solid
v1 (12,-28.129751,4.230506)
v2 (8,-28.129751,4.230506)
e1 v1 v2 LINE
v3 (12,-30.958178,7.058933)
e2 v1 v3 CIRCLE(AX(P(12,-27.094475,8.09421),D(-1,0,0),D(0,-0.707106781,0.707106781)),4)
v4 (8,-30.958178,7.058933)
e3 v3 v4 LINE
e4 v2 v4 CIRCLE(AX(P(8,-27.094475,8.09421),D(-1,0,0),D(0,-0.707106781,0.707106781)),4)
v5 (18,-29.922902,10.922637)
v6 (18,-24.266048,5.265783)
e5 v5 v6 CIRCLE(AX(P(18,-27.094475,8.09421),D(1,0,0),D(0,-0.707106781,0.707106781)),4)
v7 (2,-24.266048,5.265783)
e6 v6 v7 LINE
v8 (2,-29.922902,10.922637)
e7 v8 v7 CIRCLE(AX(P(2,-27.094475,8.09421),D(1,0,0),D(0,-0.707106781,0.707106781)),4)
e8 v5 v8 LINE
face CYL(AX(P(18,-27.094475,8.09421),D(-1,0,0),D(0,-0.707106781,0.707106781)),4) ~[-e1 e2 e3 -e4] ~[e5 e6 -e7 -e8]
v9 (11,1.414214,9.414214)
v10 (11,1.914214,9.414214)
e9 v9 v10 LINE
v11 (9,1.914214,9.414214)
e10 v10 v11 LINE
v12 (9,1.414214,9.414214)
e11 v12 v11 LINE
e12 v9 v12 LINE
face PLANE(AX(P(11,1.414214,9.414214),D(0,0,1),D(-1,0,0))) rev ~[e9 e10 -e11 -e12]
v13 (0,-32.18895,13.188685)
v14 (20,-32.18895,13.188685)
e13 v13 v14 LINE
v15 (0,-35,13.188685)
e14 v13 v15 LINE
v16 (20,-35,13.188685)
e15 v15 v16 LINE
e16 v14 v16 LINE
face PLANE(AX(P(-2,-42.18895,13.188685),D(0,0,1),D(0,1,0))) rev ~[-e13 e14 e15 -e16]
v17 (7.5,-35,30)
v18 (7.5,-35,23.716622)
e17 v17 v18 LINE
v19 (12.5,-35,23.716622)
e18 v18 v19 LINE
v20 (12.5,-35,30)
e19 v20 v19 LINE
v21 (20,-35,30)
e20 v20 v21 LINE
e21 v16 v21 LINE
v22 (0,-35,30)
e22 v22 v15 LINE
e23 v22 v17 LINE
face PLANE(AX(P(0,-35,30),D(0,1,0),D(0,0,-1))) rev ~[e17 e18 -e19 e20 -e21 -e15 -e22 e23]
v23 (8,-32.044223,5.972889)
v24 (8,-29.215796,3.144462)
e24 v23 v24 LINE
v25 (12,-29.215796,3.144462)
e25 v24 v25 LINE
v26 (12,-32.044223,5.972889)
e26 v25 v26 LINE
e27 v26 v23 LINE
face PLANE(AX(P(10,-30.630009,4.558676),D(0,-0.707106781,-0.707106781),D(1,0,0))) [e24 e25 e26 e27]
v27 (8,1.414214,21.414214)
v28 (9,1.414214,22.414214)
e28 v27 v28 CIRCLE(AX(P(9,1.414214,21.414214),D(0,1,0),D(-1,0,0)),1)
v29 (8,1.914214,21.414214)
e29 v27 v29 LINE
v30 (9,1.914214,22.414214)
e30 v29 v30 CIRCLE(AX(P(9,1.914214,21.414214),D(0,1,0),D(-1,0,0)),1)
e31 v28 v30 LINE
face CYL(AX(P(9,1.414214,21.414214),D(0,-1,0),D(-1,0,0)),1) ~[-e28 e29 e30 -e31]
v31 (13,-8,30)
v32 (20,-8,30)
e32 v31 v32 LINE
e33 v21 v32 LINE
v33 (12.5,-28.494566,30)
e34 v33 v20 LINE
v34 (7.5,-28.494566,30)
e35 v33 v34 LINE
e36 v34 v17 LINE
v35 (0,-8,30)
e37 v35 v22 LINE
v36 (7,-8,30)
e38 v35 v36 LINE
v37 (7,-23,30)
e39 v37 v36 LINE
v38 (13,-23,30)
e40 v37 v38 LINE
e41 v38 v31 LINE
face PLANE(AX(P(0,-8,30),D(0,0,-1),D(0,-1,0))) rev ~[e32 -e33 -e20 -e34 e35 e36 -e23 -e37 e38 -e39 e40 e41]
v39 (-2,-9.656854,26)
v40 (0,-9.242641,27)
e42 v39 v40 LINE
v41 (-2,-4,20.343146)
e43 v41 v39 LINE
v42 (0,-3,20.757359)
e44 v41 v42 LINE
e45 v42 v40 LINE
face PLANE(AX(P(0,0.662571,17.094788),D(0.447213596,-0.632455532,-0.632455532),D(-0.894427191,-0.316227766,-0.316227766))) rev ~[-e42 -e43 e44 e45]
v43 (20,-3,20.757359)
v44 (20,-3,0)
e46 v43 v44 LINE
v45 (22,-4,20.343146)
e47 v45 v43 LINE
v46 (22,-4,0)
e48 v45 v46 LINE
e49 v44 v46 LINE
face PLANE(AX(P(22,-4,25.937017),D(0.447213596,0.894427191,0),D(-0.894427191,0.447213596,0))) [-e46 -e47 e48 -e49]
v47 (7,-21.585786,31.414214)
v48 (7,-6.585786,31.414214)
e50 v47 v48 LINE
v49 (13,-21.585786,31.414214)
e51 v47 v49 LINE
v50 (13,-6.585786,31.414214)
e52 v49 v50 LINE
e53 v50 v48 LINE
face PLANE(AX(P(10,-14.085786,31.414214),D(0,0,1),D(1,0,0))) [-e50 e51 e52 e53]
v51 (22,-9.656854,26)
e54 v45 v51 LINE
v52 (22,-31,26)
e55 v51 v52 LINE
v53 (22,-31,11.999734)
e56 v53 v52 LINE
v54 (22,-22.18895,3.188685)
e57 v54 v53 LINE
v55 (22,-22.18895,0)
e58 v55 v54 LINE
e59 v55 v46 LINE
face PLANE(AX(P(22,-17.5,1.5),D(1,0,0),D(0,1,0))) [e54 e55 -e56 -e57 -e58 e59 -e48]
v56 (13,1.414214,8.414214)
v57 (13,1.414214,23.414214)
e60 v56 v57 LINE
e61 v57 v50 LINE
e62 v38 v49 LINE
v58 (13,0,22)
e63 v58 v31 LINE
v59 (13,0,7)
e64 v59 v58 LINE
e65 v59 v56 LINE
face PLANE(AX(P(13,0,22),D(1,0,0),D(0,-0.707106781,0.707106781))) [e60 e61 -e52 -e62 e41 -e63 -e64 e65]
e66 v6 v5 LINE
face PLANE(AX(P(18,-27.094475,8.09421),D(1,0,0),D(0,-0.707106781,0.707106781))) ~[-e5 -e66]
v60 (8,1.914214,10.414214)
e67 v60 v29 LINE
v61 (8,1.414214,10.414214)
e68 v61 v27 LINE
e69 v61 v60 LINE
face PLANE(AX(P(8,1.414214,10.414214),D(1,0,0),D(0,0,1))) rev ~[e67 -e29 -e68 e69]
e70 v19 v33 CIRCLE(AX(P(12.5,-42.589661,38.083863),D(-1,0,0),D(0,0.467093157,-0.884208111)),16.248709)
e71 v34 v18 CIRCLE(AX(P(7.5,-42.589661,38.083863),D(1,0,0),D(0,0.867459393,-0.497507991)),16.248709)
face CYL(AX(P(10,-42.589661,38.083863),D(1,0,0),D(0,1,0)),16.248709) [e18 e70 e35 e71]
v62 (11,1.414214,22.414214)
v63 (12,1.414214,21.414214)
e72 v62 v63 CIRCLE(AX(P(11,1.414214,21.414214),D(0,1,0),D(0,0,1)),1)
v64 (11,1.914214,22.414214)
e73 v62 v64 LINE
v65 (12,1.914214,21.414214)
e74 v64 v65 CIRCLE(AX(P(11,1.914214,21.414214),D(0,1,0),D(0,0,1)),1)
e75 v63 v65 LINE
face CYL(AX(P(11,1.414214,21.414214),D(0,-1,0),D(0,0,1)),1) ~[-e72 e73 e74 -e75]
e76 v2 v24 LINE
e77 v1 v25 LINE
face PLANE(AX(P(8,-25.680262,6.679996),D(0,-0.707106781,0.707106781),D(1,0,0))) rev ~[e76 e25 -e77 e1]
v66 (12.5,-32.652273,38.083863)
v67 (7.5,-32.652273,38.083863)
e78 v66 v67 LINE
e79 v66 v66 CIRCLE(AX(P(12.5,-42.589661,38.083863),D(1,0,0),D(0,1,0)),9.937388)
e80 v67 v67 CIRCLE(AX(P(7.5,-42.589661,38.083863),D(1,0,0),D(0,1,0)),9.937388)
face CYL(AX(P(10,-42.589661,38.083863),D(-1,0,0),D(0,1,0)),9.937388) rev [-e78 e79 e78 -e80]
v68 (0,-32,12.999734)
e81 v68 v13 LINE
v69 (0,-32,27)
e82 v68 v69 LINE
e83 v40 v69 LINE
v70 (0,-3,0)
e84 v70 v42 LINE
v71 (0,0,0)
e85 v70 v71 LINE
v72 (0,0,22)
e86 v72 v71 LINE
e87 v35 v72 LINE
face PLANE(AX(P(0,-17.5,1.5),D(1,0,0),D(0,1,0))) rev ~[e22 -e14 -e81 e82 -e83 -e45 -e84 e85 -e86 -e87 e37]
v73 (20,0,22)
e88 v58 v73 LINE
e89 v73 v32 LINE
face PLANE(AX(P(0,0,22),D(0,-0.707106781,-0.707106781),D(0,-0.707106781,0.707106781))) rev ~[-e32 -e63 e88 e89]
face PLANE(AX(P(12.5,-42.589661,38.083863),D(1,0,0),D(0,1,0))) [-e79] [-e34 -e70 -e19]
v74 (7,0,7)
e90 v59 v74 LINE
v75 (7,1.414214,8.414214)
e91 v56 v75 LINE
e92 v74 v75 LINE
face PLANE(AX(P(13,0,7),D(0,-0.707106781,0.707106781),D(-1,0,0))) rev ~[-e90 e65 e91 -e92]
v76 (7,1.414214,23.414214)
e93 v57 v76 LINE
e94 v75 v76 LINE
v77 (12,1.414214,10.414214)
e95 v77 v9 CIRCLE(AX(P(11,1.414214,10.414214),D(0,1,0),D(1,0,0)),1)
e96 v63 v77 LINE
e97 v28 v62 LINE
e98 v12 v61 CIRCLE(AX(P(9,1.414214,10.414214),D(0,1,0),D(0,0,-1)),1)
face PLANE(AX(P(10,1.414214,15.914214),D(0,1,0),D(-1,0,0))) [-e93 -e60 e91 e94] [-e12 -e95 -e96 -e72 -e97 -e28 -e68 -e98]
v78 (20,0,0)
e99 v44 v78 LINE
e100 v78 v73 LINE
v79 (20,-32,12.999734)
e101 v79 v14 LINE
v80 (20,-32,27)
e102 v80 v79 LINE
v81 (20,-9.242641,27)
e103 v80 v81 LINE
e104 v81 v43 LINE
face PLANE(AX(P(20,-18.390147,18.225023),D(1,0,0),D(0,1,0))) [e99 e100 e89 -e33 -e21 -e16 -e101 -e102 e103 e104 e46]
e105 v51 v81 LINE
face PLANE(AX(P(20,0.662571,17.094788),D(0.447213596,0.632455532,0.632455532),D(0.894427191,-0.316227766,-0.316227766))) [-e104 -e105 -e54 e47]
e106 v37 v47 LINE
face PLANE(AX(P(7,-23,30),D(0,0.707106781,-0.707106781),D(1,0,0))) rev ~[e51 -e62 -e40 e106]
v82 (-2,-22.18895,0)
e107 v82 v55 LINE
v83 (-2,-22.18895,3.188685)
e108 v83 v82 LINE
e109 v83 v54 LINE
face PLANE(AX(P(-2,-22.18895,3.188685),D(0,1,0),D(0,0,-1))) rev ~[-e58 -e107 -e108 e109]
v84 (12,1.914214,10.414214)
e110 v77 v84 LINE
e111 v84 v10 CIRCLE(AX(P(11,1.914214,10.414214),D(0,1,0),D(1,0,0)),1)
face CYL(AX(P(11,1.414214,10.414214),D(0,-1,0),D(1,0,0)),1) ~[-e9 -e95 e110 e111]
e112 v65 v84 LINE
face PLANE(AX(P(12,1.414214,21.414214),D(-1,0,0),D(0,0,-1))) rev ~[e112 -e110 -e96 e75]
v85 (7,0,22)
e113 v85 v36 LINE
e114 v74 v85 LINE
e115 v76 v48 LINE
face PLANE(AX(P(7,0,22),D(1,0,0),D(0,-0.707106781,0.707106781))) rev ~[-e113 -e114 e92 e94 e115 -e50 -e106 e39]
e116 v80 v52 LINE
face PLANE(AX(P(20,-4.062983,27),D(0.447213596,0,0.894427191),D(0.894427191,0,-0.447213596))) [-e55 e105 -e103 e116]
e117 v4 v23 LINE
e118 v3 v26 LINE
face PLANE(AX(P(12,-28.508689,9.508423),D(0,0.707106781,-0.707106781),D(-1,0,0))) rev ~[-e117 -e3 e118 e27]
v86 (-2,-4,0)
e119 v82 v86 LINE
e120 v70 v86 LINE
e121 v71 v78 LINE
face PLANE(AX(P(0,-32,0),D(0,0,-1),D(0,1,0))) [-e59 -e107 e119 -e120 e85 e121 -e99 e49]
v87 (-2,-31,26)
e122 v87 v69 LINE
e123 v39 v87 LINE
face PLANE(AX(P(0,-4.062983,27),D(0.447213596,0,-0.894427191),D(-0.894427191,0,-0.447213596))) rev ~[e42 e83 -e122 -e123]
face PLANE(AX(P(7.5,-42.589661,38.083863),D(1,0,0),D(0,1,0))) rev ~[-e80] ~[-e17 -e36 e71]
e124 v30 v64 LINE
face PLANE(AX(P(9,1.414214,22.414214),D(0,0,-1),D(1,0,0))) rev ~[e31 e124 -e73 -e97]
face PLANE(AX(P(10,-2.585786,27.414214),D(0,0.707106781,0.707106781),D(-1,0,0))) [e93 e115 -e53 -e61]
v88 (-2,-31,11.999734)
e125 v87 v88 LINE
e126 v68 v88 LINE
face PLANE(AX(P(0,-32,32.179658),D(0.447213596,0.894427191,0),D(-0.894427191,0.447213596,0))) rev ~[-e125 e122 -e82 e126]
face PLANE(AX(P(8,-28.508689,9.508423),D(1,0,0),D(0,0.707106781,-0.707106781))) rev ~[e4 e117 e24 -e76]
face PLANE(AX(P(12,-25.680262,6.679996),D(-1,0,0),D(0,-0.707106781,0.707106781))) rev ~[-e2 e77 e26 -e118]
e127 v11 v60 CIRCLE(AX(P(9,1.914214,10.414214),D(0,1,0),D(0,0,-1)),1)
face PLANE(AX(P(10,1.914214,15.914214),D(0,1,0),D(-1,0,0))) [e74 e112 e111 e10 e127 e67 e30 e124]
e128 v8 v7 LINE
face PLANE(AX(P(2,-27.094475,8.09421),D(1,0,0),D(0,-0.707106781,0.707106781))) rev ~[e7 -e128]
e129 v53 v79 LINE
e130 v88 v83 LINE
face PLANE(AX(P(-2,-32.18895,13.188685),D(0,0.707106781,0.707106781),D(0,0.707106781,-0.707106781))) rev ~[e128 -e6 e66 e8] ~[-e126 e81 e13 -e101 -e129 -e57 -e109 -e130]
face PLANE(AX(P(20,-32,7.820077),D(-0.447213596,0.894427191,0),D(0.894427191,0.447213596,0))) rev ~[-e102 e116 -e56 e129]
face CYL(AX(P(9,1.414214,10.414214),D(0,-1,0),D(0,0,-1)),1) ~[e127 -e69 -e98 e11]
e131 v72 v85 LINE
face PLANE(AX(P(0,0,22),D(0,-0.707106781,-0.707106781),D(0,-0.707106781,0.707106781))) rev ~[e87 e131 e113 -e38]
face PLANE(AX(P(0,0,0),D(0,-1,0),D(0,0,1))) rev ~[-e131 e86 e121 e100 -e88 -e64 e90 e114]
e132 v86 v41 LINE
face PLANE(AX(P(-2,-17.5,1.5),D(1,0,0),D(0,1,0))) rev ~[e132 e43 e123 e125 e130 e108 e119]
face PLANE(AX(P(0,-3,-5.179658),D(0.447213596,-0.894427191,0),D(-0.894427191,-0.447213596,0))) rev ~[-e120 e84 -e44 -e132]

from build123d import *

# Parameters (mm, degrees)
F2_DEPTH       = 20
F3_DEPTH       = 22
F3_DEPTH_BACK  = 2
F1_W           = 29
F1_H           = 3
F7_DEPTH       = 22
F7_DEPTH_BACK  = 2
F5_W           = 6
F5_H           = 11.313708499
F4_W           = 6
F4_H           = 15
F6_W           = 6
F6_H           = 15
F8_DEPTH       = 2
F10_DEPTH      = 25
F12_DEPTH      = 5
F15_DEPTH      = 0.5
F16_R          = 16.2487088964
F16_R_2        = 9.9373882072
F17_DEPTH      = 2.5
F17_DEPTH_BACK = 2.5
F18_T4_DEPTH   = 31.116674808
F18_T9_DEPTH   = 19.1877426199
F18_T14_DEPTH  = 33.116674808
F18_T19_DEPTH  = 24.3595810189
F18_T24_DEPTH  = 24.3595810189
F18_T29_DEPTH  = 33.116674808
F18_T34_DEPTH  = 19.1877426199
F18_T39_DEPTH  = 31.116674808


# Not quite as in the source:
# - a fillet or chamfer that OpenCascade refuses, or shapes differently, is made with other operations: its cross-section is extruded or revolved along the edge and cut away or added
# - two fillets or chamfers of one size are made in one step


with BuildPart() as f2:
    # F1 (on Right) → F2 (new body)
    with BuildSketch(Plane.YZ):
        Polygon((-35, 30), (-35, 0), (-32, 0), (-32, 3), (-32, 27), (-9.2426406871, 27), (-3, 20.7573593129), (-3, 3), (-3, 0), (0, 0), (0, 22), (-8, 30), align=None)
    extrude(amount=F2_DEPTH)

    # F1 (on Right) → F3 (join, two sides)
    with BuildSketch(Plane.YZ) as f3_sk:
        Polygon((-32, 27), (-32, 3), (-3, 3), (-3, 20.7573593129), (-9.2426406871, 27), align=None)
    extrude(amount=F3_DEPTH)
    extrude(f3_sk.sketch, amount=-F3_DEPTH_BACK)

    # F1 (on Right) → F7 (join, two sides)
    with BuildSketch(Plane.YZ) as f7_sk:
        with Locations((-17.5, 1.5)):
            Rectangle(F1_W, F1_H)
    extrude(amount=F7_DEPTH)
    extrude(f7_sk.sketch, amount=-F7_DEPTH_BACK)

    # F5 (on face) + F4 (on face) + F6 (on face) → F8 (join)
    with BuildSketch(Plane(origin=(0, 11, 11), x_dir=(-1, 0, 0), z_dir=(0, 0.7071067812, 0.7071067812))):
        with Locations((-10, 21.2132034356)):
            Rectangle(F5_W, F5_H)
    with BuildSketch(Plane(origin=(0, 0, 0), x_dir=(-1, 0, 0), z_dir=(0, 1, 0))):
        with Locations((-10, 14.5)):
            Rectangle(F4_W, F4_H)
    with BuildSketch(Plane.XY.offset(30)):
        with Locations((10, -15.5)):
            Rectangle(F6_W, F6_H)
    extrude(amount=F8_DEPTH, dir=(0, 0.7071067812, 0.7071067812))

    # F9 (on face) → F10 (cut)
    with BuildSketch(Plane(origin=(-2, 0, 0), x_dir=(0, -1, 0), z_dir=(-1, 0, 0))):
        Polygon((22.18895033, -6.8113151938), (42.18895033, -6.8113151938), (42.18895033, 13.1886848062), (32.18895033, 13.1886848062), (32, 12.9997344762), (32, 0), (22.18895033, 0), align=None)
        Polygon((22.18895033, 3.1886848062), (22.18895033, 0), (32, 0), (32, 12.9997344762), align=None)
    extrude(amount=-F10_DEPTH, mode=Mode.SUBTRACT)

    # F11 (on face) → F12 (join)
    with BuildSketch(Plane(origin=(0, -9.5001327619, -9.5001327619), x_dir=(1, 0, 0), z_dir=(0, -0.7071067812, -0.7071067812))):
        Polygon((8, 26.8821576475), (8, 24.8821576475), (8, 22.8821576475), (12, 22.8821576475), (12, 24.8821576475), (12, 26.8821576475), align=None)
    extrude(amount=F12_DEPTH)

    # F11 (on face) → F13 (revolve)
    with BuildSketch(Plane(origin=(0, -9.5001327619, -9.5001327619), x_dir=(1, 0, 0), z_dir=(0, -0.7071067812, -0.7071067812))):
        Polygon((2, 28.8821576475), (2, 24.8821576475), (8, 24.8821576475), (8, 26.8821576475), (12, 26.8821576475), (12, 24.8821576475), (18, 24.8821576475), (18, 28.8821576475), align=None)
    revolve(axis=Axis((5, -27.094475165, 8.0942096412), (1, 0, 0)))

    # F14 (on face) → F15 (join)
    with BuildSketch(Plane(origin=(0, 1.4142135624, 0), x_dir=(-1, 0, 0), z_dir=(0, 1, 0))):
        with BuildLine():
            Line((-12, 21.4142135624), (-12, 10.4142135624))
            ThreePointArc((-12, 10.4142135624), (-11.7071067812, 9.7071067812), (-11, 9.4142135624))
            Line((-11, 9.4142135624), (-9, 9.4142135624))
            ThreePointArc((-9, 9.4142135624), (-8.2928932188, 9.7071067812), (-8, 10.4142135624))
            Line((-8, 10.4142135624), (-8, 21.4142135624))
            ThreePointArc((-8, 21.4142135624), (-8.2928932188, 22.1213203436), (-9, 22.4142135624))
            Line((-9, 22.4142135624), (-11, 22.4142135624))
            ThreePointArc((-11, 22.4142135624), (-11.7071067812, 22.1213203436), (-12, 21.4142135624))
        make_face()
    extrude(amount=F15_DEPTH)

    # F16 (on offset) → F17 (join, two sides)
    with BuildSketch(Plane.YZ.offset(10)) as f17_sk:
        with Locations((-42.5896607339, 38.0838625133)):
            Circle(F16_R)
        with Locations((-42.5896607339, 38.0838625133)):
            Circle(F16_R_2, mode=Mode.SUBTRACT)
    extrude(amount=F17_DEPTH)
    extrude(f17_sk.sketch, amount=-F17_DEPTH_BACK)

    # F18: chamfer of 2 x 1 on 8 edges, made by hand


with BuildPart() as f18_tool2:
    # F18_s3 → F18_t4 (new body)
    with BuildSketch(Plane.XY.offset(-5.1796577476)):
        Polygon((0, -3), (-2, -4), (-2, -3), align=None)
    extrude(amount=F18_T4_DEPTH)

    split(bisect_by=Plane.YZ, keep=Keep.BOTTOM)


with BuildPart() as f2_1:
    add(f2.part)

    # F18_t1: cut F18_tool2
    add(f18_tool2.part, mode=Mode.SUBTRACT)


with BuildPart() as f18_tool7:
    # F18_s8 → F18_t9 (new body)
    with BuildSketch(Plane(origin=(0, -8.2161085389, 8.2161085389), x_dir=(1, 0, 0), z_dir=(0, -0.7071067812, 0.7071067812))):
        Polygon((0, 12.5563491861), (-2, 11.5563491861), (-2, 12.5563491861), align=None)
    extrude(amount=F18_T9_DEPTH)

    split(bisect_by=Plane.YZ, keep=Keep.BOTTOM)


with BuildPart() as f2_2:
    add(f2_1.part)

    # F18_t6: cut F18_tool7
    add(f18_tool7.part, mode=Mode.SUBTRACT)


with BuildPart() as f18_tool12:
    # F18_s13 → F18_t14 (new body)
    with BuildSketch(Plane.XZ.offset(4.0629829395)):
        Polygon((0, 27), (-2, 26), (-2, 27), align=None)
    extrude(amount=F18_T14_DEPTH)

    split(bisect_by=Plane.YZ, keep=Keep.BOTTOM)


with BuildPart() as f2_3:
    add(f2_2.part)

    # F18_t11: cut F18_tool12
    add(f18_tool12.part, mode=Mode.SUBTRACT)


with BuildPart() as f18_tool17:
    # F18_s18 → F18_t19 (new body)
    with BuildSketch(Plane.XY.offset(32.1796577476)):
        Polygon((0, -32), (-2, -31), (-2, -32), align=None)
    extrude(amount=-F18_T19_DEPTH)

    split(bisect_by=Plane.YZ, keep=Keep.BOTTOM)


with BuildPart() as f2_4:
    add(f2_3.part)

    # F18_t16: cut F18_tool17
    add(f18_tool17.part, mode=Mode.SUBTRACT)


with BuildPart() as f18_tool22:
    # F18_s23 → F18_t24 (new body)
    with BuildSketch(Plane.XY.offset(7.8200767286)):
        Polygon((20, -32), (22, -31), (22, -32), align=None)
    extrude(amount=F18_T24_DEPTH)

    split(bisect_by=Plane.YZ.offset(20), keep=Keep.TOP)


with BuildPart() as f2_5:
    add(f2_4.part)

    # F18_t21: cut F18_tool22
    add(f18_tool22.part, mode=Mode.SUBTRACT)


with BuildPart() as f18_tool27:
    # F18_s28 → F18_t29 (new body)
    with BuildSketch(Plane.XZ.offset(4.0629829395)):
        Polygon((20, 27), (22, 26), (22, 27), align=None)
    extrude(amount=F18_T29_DEPTH)

    split(bisect_by=Plane.YZ.offset(20), keep=Keep.TOP)


with BuildPart() as f2_6:
    add(f2_5.part)

    # F18_t26: cut F18_tool27
    add(f18_tool27.part, mode=Mode.SUBTRACT)


with BuildPart() as f18_tool32:
    # F18_s33 → F18_t34 (new body)
    with BuildSketch(Plane(origin=(0, -8.2161085389, 8.2161085389), x_dir=(1, 0, 0), z_dir=(0, -0.7071067812, 0.7071067812))):
        Polygon((20, 12.5563491861), (22, 11.5563491861), (22, 12.5563491861), align=None)
    extrude(amount=F18_T34_DEPTH)

    split(bisect_by=Plane.YZ.offset(20), keep=Keep.TOP)


with BuildPart() as f2_7:
    add(f2_6.part)

    # F18_t31: cut F18_tool32
    add(f18_tool32.part, mode=Mode.SUBTRACT)


with BuildPart() as f18_tool37:
    # F18_s38 → F18_t39 (new body)
    with BuildSketch(Plane.XY.offset(25.9370170605)):
        Polygon((22, -4), (20, -3), (22, -3), align=None)
    extrude(amount=-F18_T39_DEPTH)

    split(bisect_by=Plane.YZ.offset(20), keep=Keep.TOP)


with BuildPart() as f2_8:
    add(f2_7.part)

    # F18_t36: cut F18_tool37
    add(f18_tool37.part, mode=Mode.SUBTRACT)


solid = f2_8.part
